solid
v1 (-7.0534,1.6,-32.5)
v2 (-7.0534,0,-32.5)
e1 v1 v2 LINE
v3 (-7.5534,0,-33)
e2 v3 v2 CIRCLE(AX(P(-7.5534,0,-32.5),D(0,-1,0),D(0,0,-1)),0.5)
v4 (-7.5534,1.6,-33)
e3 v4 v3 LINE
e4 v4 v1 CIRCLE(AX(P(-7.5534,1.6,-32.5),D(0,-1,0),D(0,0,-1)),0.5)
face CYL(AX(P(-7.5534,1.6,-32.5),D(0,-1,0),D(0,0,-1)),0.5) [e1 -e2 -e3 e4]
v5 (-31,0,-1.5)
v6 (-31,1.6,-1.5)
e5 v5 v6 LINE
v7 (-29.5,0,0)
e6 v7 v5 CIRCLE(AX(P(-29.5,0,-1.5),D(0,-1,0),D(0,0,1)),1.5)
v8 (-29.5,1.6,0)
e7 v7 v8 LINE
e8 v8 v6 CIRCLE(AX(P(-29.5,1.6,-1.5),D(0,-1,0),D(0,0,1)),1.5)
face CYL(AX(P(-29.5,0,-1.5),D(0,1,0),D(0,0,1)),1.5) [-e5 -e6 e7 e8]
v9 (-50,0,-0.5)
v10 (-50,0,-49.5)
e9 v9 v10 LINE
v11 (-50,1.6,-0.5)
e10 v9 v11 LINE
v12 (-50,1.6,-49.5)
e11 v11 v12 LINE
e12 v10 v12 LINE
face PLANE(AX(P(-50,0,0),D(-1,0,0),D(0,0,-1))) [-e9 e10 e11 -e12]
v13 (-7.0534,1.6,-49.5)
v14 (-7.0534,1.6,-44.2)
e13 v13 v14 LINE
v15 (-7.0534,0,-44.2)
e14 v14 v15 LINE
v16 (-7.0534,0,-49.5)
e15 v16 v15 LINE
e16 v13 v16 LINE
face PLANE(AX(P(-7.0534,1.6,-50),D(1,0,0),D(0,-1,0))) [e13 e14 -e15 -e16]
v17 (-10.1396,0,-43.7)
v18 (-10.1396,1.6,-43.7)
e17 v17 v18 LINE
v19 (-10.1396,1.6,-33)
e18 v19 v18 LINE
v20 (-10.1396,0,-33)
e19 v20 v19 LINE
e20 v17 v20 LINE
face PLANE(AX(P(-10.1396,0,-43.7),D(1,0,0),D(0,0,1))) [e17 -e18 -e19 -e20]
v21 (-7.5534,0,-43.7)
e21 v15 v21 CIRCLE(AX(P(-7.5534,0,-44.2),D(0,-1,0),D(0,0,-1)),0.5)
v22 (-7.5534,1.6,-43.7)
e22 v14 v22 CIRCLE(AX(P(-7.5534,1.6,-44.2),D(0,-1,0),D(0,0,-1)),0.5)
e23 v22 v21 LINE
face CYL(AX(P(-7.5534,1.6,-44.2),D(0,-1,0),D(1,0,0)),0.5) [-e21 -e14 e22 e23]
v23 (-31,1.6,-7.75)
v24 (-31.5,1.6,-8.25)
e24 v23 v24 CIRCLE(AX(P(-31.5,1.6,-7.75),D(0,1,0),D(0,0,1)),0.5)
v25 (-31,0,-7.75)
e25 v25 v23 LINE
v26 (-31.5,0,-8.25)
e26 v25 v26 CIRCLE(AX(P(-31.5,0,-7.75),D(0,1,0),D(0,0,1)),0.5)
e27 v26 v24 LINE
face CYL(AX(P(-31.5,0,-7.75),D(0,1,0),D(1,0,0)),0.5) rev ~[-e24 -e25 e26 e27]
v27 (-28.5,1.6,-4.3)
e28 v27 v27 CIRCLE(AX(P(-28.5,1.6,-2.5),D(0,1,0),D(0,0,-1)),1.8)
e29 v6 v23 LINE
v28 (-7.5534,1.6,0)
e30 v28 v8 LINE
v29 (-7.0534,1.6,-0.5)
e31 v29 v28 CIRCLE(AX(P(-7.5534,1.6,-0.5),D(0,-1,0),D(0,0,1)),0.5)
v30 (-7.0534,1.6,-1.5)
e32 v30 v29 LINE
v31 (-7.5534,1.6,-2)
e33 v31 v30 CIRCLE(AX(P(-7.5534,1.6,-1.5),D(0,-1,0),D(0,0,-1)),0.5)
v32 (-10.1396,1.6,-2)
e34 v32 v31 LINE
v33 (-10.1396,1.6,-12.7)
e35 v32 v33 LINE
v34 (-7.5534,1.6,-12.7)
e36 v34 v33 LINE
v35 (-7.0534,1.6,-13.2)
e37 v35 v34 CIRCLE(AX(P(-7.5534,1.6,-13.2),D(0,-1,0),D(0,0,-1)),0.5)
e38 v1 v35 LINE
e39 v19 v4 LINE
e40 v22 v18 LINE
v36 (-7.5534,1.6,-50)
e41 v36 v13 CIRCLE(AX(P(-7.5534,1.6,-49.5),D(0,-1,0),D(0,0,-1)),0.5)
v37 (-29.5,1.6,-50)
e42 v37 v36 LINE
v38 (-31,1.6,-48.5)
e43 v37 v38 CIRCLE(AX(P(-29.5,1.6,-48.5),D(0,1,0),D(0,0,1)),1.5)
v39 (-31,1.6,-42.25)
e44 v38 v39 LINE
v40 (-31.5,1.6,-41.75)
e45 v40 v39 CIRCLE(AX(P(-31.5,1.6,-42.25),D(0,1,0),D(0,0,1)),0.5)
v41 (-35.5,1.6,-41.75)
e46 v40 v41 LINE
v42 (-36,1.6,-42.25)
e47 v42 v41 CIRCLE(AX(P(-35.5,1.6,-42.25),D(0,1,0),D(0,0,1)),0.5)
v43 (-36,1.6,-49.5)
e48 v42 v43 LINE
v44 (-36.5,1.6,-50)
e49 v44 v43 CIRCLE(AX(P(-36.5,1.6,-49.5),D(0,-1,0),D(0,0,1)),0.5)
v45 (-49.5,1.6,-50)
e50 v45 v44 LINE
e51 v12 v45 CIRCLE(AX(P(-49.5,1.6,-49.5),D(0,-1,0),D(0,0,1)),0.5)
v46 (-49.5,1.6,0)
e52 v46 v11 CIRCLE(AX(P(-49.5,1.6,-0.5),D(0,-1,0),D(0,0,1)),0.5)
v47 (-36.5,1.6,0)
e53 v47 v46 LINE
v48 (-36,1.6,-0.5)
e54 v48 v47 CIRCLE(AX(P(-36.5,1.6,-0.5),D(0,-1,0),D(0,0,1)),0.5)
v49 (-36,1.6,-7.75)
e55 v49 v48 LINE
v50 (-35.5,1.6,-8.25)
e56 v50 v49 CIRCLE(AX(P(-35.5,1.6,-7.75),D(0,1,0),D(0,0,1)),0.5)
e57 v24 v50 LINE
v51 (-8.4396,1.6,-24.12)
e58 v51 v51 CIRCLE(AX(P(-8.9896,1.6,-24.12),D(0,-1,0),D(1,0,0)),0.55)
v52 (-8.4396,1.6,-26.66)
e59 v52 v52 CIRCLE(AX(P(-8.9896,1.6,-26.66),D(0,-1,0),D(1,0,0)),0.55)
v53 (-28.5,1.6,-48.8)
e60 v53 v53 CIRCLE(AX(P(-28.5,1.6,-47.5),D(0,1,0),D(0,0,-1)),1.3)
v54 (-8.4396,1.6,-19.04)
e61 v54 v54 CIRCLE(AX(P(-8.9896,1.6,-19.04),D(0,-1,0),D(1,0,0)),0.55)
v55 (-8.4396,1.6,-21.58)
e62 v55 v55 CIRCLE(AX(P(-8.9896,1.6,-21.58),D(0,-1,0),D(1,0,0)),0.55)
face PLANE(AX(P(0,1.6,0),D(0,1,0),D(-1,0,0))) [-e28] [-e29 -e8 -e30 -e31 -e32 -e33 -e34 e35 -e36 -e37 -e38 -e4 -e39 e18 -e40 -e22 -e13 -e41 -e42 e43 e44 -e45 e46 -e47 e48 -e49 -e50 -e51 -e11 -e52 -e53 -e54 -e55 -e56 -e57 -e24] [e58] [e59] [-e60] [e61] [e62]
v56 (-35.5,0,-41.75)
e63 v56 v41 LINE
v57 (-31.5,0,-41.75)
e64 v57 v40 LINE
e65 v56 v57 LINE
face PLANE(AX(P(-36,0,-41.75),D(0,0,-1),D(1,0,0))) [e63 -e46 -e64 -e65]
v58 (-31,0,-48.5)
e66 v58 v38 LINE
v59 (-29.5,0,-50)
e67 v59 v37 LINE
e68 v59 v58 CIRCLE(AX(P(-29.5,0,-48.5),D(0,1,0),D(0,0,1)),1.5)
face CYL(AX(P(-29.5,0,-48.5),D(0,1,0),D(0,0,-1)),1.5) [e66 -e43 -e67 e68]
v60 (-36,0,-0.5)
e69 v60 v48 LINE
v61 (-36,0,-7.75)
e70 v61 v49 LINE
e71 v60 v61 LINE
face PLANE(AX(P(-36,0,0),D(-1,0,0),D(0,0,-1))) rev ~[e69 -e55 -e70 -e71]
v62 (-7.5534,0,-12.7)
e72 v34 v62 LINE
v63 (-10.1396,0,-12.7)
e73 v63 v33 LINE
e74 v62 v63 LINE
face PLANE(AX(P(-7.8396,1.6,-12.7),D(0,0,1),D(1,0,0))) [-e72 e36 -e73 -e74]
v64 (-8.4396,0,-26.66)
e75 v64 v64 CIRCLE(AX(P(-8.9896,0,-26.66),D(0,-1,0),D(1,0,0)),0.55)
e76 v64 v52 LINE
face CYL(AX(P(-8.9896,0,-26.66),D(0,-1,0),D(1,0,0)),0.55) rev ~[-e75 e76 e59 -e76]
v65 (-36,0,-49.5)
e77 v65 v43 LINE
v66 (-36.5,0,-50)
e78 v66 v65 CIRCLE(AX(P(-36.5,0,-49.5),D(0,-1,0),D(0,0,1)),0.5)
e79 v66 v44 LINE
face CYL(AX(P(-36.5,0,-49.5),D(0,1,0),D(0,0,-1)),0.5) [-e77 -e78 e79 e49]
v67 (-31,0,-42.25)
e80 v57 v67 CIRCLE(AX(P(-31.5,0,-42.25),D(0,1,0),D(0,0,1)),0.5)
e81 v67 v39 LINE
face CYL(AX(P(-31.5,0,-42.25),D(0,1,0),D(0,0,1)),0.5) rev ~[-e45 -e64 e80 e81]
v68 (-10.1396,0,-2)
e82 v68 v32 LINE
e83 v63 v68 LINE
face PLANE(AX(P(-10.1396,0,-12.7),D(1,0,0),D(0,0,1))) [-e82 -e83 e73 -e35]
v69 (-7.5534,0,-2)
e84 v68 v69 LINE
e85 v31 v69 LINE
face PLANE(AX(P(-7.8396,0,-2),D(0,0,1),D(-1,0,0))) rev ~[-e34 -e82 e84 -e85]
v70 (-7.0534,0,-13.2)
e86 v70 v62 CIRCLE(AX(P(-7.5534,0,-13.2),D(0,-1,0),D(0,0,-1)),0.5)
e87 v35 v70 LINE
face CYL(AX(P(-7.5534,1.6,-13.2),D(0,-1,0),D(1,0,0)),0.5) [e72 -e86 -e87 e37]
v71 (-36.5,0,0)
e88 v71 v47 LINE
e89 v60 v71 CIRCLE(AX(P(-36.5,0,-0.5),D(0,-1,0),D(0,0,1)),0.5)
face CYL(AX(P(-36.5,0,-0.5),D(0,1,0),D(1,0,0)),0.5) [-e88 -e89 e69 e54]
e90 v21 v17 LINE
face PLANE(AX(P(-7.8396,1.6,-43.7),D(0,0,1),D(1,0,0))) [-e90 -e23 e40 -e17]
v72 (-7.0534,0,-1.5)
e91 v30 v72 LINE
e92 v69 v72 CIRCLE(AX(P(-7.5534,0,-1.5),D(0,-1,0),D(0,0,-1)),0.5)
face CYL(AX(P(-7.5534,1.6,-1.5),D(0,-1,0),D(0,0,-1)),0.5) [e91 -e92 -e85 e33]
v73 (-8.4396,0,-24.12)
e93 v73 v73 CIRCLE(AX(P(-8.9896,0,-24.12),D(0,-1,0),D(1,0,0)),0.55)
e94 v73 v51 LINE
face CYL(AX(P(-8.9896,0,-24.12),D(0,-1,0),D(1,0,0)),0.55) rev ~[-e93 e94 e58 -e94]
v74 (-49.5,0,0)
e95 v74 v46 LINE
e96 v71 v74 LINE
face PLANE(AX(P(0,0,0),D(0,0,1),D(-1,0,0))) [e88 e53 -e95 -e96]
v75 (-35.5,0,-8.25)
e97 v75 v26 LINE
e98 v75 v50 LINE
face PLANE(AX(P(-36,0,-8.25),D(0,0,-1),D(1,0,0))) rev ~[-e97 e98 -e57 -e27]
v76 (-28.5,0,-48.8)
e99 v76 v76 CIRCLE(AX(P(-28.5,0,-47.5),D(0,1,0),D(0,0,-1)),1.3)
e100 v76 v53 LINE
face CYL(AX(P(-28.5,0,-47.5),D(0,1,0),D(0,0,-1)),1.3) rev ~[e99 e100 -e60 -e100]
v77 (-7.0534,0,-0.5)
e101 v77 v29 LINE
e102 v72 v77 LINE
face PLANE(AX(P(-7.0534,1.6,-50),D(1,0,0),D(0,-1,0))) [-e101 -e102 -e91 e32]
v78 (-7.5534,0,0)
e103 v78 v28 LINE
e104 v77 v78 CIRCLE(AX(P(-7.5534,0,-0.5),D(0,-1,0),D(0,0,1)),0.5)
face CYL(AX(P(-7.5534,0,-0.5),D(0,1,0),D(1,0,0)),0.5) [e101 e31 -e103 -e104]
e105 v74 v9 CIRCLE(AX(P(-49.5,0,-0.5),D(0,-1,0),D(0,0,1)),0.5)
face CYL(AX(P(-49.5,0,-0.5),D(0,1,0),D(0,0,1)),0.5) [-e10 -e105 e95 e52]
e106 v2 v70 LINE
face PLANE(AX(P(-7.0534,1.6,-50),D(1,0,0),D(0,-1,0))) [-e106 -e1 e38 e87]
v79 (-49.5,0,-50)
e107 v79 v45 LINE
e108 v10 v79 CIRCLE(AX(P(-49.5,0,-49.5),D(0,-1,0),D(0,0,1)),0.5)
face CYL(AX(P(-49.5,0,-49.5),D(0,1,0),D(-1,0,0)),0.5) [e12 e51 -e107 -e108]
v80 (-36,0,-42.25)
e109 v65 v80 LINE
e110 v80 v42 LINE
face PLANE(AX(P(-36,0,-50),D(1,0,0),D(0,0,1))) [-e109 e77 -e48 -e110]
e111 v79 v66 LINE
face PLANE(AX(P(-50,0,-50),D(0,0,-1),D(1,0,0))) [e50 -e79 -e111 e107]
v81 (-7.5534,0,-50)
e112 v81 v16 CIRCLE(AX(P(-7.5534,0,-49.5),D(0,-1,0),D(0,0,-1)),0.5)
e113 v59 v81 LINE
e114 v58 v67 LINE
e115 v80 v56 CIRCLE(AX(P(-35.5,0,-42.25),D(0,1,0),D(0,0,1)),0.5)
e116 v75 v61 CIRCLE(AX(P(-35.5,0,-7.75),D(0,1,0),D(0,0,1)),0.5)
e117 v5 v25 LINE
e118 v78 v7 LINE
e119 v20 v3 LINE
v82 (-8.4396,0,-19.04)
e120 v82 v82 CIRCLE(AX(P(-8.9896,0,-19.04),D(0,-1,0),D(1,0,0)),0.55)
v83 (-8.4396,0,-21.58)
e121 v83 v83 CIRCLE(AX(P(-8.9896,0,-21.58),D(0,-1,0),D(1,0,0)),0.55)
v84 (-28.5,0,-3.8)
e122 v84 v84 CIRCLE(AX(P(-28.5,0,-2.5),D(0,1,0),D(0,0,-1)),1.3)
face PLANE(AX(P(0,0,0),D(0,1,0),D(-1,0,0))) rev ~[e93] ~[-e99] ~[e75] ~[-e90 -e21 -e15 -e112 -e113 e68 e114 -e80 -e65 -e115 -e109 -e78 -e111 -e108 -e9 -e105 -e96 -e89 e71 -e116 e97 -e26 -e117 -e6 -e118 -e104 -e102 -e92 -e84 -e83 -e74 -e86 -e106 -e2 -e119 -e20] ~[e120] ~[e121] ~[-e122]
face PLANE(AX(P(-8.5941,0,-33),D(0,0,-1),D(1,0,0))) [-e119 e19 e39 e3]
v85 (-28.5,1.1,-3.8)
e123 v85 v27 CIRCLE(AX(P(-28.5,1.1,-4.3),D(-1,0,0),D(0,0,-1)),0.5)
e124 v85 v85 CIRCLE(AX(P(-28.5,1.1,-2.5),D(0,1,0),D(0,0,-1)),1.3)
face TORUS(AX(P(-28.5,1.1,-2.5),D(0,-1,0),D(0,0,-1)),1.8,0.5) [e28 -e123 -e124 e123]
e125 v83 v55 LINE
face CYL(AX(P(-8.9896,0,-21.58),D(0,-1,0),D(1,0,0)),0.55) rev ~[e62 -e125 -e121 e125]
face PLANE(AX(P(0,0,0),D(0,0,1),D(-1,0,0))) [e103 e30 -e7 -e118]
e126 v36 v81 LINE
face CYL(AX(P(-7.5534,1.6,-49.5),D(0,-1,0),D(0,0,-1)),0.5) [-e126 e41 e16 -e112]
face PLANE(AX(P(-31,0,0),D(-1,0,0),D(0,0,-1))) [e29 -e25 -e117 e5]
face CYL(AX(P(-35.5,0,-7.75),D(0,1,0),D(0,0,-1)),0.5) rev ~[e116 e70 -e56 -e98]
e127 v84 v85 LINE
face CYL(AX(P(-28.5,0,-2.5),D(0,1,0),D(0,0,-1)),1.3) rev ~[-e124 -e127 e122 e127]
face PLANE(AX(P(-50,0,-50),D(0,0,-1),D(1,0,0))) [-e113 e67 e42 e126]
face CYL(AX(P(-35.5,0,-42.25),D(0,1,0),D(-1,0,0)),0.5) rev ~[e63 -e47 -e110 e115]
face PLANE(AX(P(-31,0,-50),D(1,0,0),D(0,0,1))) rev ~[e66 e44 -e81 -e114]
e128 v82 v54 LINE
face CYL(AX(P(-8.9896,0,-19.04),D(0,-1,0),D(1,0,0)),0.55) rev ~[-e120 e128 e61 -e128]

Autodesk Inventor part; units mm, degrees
ref_plane "YZ Plane" through (0, 0, 0) normal (1, 0, 0) x (0, 1, 0)
ref_plane "XZ Plane" through (0, 0, 0) normal (0, 1, 0) x (-1, 0, 0)
ref_plane "XY Plane" through (0, 0, 0) normal (0, 0, 1) x (1, 0, 0)
sketch "Szkic1" plane through (0, 0, 0) normal (0, 1, 0) x (-1, 0, 0)
  line L0 (0, 0) -> (50, 0)
  line L1 (50, 0) -> (50, -50)
  line L2 (50, -50) -> (0, -50)
  line L3 (0, -50) -> (0, 0)
  dimension "d0" = 50
  dimension "d1" = 50
extrude "Wyciągnięcie proste1" add sketch "Szkic1" along normal blind 1.6
sketch "Szkic2" plane through (-50, 0, 0) normal (0, 0, 1) x (1, 0, 0)
  line L0 (0, 0) -> (50, 0) projected
  line L1 (50, 0) -> (50, 1.6) projected
  line L2 (0, 1.6) -> (50, 1.6) projected
  line L3 (0, 0) -> (0, 1.6) projected
  line L4 (47.9294, 17.85) -> (42.5705, -2.15) projected
  line L5 (42.5705, -2.15) -> (44.641, -2.15) projected
  line L6 (44.641, -2.15) -> (50, 17.85) projected
  line L7 (50, 17.85) -> (47.9294, 17.85) projected
  point P0 (43.5753, 1.6)
  point P1 (43.1466, 0)
extrude "Wyciągnięcie proste2" cut sketch "Szkic2" against normal through all contours L4 L2 L6 L0 | L6 L2 L1 L0
sketch "Szkic3" plane through (0, 0, 0) normal (0, -1, 0) x (1, 0, 0)
  line L0 (-8.5941, -2) -> (-8.5941, -12.7) projected
  line L1 (-8.5941, -2) -> (-10.1396, -2) projected
  line L2 (-10.1396, -12.7) -> (-10.1396, -2) projected
  line L3 (-8.5941, -12.7) -> (-10.1396, -12.7) projected
  line L4 (-10.1396, -12.7) -> (-7.8396, -12.7)
  line L5 (-7.8396, -12.7) -> (-7.8396, -2)
  line L6 (-7.8396, -2) -> (-10.1396, -2)
  line L7 (-10.1396, -2) -> (-10.1396, -12.7)
  line L8 (-8.5941, -33) -> (-8.5941, -43.7) projected
  line L9 (-8.5941, -33) -> (-10.1396, -33) projected
  line L10 (-10.1396, -43.7) -> (-10.1396, -33) projected
  line L11 (-8.5941, -43.7) -> (-10.1396, -43.7) projected
  line L12 (-10.1396, -33) -> (-7.8396, -33)
  line L13 (-7.8396, -33) -> (-7.8396, -43.7)
  line L14 (-7.8396, -43.7) -> (-10.1396, -43.7)
  line L15 (-10.1396, -43.7) -> (-10.1396, -33)
  point P0 (0, 0)
  dimension "d6" = 2.3
  dimension "d7" = 2.3
extrude "Wyciągnięcie proste3" cut sketch "Szkic3" against normal through all
sketch "Szkic4" plane through (0, 0, 0) normal (0, -1, 0) x (1, 0, 0)
  line L0 (-10.1396, -33) -> (-7.8396, -33) projected
  line L1 (-7.8396, -12.7) -> (-10.1396, -12.7) projected
  line L2 (-8.9896, -12.7) -> (-8.9896, -33) construction
  circle A0 centre (-8.9896, -26.66) radius 0.55
  circle A1 centre (-8.9896, -24.12) radius 0.55
  circle A2 centre (-8.9896, -21.58) radius 0.55
  circle A3 centre (-8.9896, -19.04) radius 0.55
  point P0 (0, 0)
  dimension "d10" = 1.1
  dimension "d14" = 2.54
  dimension "d19" = 6.34
extrude "Wyciągnięcie proste4" cut sketch "Szkic4" against normal through all
sketch "Szkic5" plane through (0, 0, 0) normal (0, -1, 0) x (1, 0, 0)
  line L0 (-50, -50) -> (-50, 0) projected
  circle A0 centre (-8.9896, -21.58) radius 0.55 projected
  circle A1 centre (-8.9896, -24.12) radius 0.55 projected
  circle A2 centre (-8.9896, -19.04) radius 0.55 projected
  circle A3 centre (-8.9896, -26.66) radius 0.55 projected
  line L1 (-10.1396, -12.7) -> (-10.1396, -2) projected
  line L2 (-10.1396, -2) -> (-7.8396, -2) projected
  line L3 (-7.8396, -2) -> (-7.8396, -12.7) projected
  line L4 (-7.8396, -12.7) -> (-10.1396, -12.7) projected
  line L5 (-10.1396, -43.7) -> (-10.1396, -33) projected
  line L6 (-10.1396, -33) -> (-7.8396, -33) projected
  line L7 (-7.8396, -33) -> (-7.8396, -43.7) projected
  line L8 (-7.8396, -43.7) -> (-10.1396, -43.7) projected
  line L9 (-6.8534, -50) -> (-6.8534, 0) projected
  line L10 (-50, 0) -> (-6.8534, 0) projected
  line L11 (-50, -50) -> (-50, 0) projected
  line L12 (-6.8534, -50) -> (-50, -50) projected
  line L13 (-50, -50) -> (-50, 0) projected
  line L14 (-50, -25) -> (-6.8534, -25)
  line L15 (-34, -48.25) -> (-34, -43.25) projected
  line L16 (-32, -48.25) -> (-34, -48.25) projected
  line L17 (-32, -43.25) -> (-32, -48.25) projected
  line L18 (-34, -43.25) -> (-32, -43.25) projected
  line L19 (-30.5, -46.7732) -> (-30.5, -50) projected
  line L20 (-36, -50) -> (-50, -50) projected
  line L21 (-28, -36) -> (-45.016, -36) projected
  line L22 (-30.5, -50) -> (-36, -50)
  line L23 (-36, -50) -> (-36, -41.75)
  line L24 (-36, -41.75) -> (-30.5, -41.75)
  line L25 (-30.5, -41.75) -> (-30.5, -50)
  line L26 (-36, 0) -> (-36, -8.25)
  line L27 (-36, -8.25) -> (-30.5, -8.25)
  line L28 (-30.5, -8.25) -> (-30.5, 0)
  point P0 (0, 0)
  dimension "d22" = 2
  dimension "d23" = 1.5
extrude "Wyciągnięcie proste5" cut sketch "Szkic5" against normal through all contours L23 L24 L25 L19 L12 | L10 L28 L27 L26 | L15 L18 L17 L16
fillet "Zaokrąglenie2" radius 0.5 2 edges at (-50, 0.8, 0) (-50, 0.8, -50)
sketch "Szkic7" plane through (-6.8534, 0, -50) normal (0, 0, -1) x (-1, 0, 0)
  line L0 (-0.4287, 1.6) -> (23.6466, 1.6) projected
  line L1 (-0.4287, 1.6) -> (0, 0) projected
  line L2 (0, 0) -> (23.6466, 0) projected
  line L3 (0, 0) -> (0, 1.6)
  line L4 (0.2, 1.6) -> (0.2, 0)
  line L5 (23.6466, 0) -> (23.6466, 1.6) projected
  line L6 (42.6466, 1.6) -> (42.6466, 0) projected
  line L7 (29.1466, 1.6) -> (42.6466, 1.6) projected
  line L8 (29.1466, 1.6) -> (29.1466, 0) projected
  line L9 (29.1466, 0) -> (42.6466, 0) projected
  point P0 (-6.8534, 0)
  dimension "d30" = 0.2
extrude "Wyciągnięcie proste7" cut sketch "Szkic7" against normal through all contours L0 L3 L1 | L0 L4 L2 L3
sketch "Szkic9" plane through (0, 1.6, 0) normal (0, 1, 0) x (1, 0, 0)
  circle A0 centre (-8.9896, 21.58) radius 0.55 projected
  circle A1 centre (-8.9896, 24.12) radius 0.55 projected
  circle A2 centre (-8.9896, 19.04) radius 0.55 projected
  circle A3 centre (-8.9896, 26.66) radius 0.55 projected
  line L0 (-10.1396, 2) -> (-10.1396, 12.7) projected
  line L1 (-10.1396, 12.7) -> (-7.8396, 12.7) projected
  line L2 (-7.8396, 12.7) -> (-7.8396, 2) projected
  line L3 (-7.8396, 2) -> (-10.1396, 2) projected
  line L4 (-10.1396, 33) -> (-10.1396, 43.7) projected
  line L5 (-10.1396, 43.7) -> (-7.8396, 43.7) projected
  line L6 (-7.8396, 43.7) -> (-7.8396, 33) projected
  line L7 (-7.8396, 33) -> (-10.1396, 33) projected
  line L8 (-7.0534, 0) -> (-7.0534, 50) projected
  line L9 (-7.0534, 50) -> (-30.5, 50) projected
  line L10 (-30.5, 50) -> (-30.5, 41.75) projected
  line L11 (-30.5, 41.75) -> (-36, 41.75) projected
  line L12 (-36, 41.75) -> (-36, 50) projected
  line L13 (-36, 50) -> (-49.5, 50) projected
  arc A4 (-49.5, 50) -> (-50, 49.5) centre (-49.5, 49.5) ccw projected
  line L14 (-50, 49.5) -> (-50, 0.5) projected
  arc A5 (-50, 0.5) -> (-49.5, 0) centre (-49.5, 0.5) ccw projected
  line L15 (-49.5, 0) -> (-36, 0) projected
  line L16 (-36, 0) -> (-36, 8.25) projected
  line L17 (-36, 8.25) -> (-30.5, 8.25) projected
  line L18 (-30.5, 8.25) -> (-30.5, 0) projected
  line L19 (-30.5, 0) -> (-7.0534, 0) projected
  line L20 (-10.1396, 12.7) -> (-7.0534, 12.7)
  line L21 (-7.0534, 12.7) -> (-7.0534, 2)
  line L22 (-7.0534, 2) -> (-10.1396, 2)
  line L23 (-10.1396, 2) -> (-10.1396, 12.7)
  line L24 (-10.1396, 43.7) -> (-7.0534, 43.7)
  line L25 (-7.0534, 43.7) -> (-7.0534, 33)
  line L26 (-7.0534, 33) -> (-10.1396, 33)
  line L27 (-10.1396, 33) -> (-10.1396, 43.7)
  point P0 (0, 0)
  point P1 (-7.8396, 2)
extrude "Wyciągnięcie proste8" cut sketch "Szkic9" against normal through all contours L2 L20 L8 L22 | L26 L6 L24 L8
fillet "Zaokrąglenie3" radius 0.5 6 edges at (-7.0534, 0.8, -12.7) (-7.0534, 0.8, -33) (-7.0534, 0.8, -43.7) (-7.0534, 0.8, -50) (-7.0534, 0.8, -2) (-7.0534, 0.8, 0)
sketch "Szkic11" plane through (0, 0, 0) normal (0, -1, 0) x (1, 0, 0)
  arc A0 (-7.0534, -0.5) -> (-7.5534, 0) centre (-7.5534, -0.5) ccw projected
  line L0 (-30.5, 0) -> (-7.5534, 0) projected
  line L1 (-30.5, 0) -> (-30.5, -8.25) projected
  line L2 (-30.5, -8.25) -> (-36, -8.25) projected
  line L3 (-36, -8.25) -> (-36, 0) projected
  line L4 (-49.5, 0) -> (-36, 0) projected
  arc A1 (-49.5, 0) -> (-50, -0.5) centre (-49.5, -0.5) ccw projected
  line L5 (-50, -49.5) -> (-50, -0.5) projected
  arc A2 (-50, -49.5) -> (-49.5, -50) centre (-49.5, -49.5) ccw projected
  line L6 (-36, -50) -> (-49.5, -50) projected
  line L7 (-36, -50) -> (-36, -41.75) projected
  line L8 (-36, -41.75) -> (-30.5, -41.75) projected
  line L9 (-30.5, -41.75) -> (-30.5, -50) projected
  line L10 (-7.5534, -50) -> (-30.5, -50) projected
  arc A3 (-7.5534, -50) -> (-7.0534, -49.5) centre (-7.5534, -49.5) ccw projected
  line L11 (-7.0534, -49.5) -> (-7.0534, -44.2) projected
  arc A4 (-7.0534, -44.2) -> (-7.5534, -43.7) centre (-7.5534, -44.2) ccw projected
  line L12 (-7.5534, -43.7) -> (-10.1396, -43.7) projected
  line L13 (-10.1396, -43.7) -> (-10.1396, -33) projected
  line L14 (-10.1396, -33) -> (-7.5534, -33) projected
  arc A5 (-7.5534, -33) -> (-7.0534, -32.5) centre (-7.5534, -32.5) ccw projected
  line L15 (-7.0534, -32.5) -> (-7.0534, -13.2) projected
  arc A6 (-7.0534, -13.2) -> (-7.5534, -12.7) centre (-7.5534, -13.2) ccw projected
  line L16 (-7.5534, -12.7) -> (-10.1396, -12.7) projected
  line L17 (-10.1396, -12.7) -> (-10.1396, -2) projected
  line L18 (-10.1396, -2) -> (-7.5534, -2) projected
  arc A7 (-7.5534, -2) -> (-7.0534, -1.5) centre (-7.5534, -1.5) ccw projected
  line L19 (-7.0534, -1.5) -> (-7.0534, -0.5) projected
  circle A8 centre (-8.9896, -26.66) radius 0.55 projected
  circle A9 centre (-8.9896, -19.04) radius 0.55 projected
  circle A10 centre (-8.9896, -24.12) radius 0.55 projected
  circle A11 centre (-8.9896, -21.58) radius 0.55 projected
  line L20 (-30.5, 0) -> (-31, 0)
  line L21 (-31, 0) -> (-31, -8.25)
  line L22 (-31, -8.25) -> (-30.5, -8.25)
  line L23 (-30.5, -8.25) -> (-30.5, 0)
  line L24 (-30.5, -50) -> (-31, -50)
  line L25 (-31, -50) -> (-31, -41.75)
  line L26 (-31, -41.75) -> (-30.5, -41.75)
  line L27 (-30.5, -41.75) -> (-30.5, -50)
  point P0 (0, 0)
  dimension "d40" = 0.5
  dimension "d41" = 0.5
extrude "Wyciągnięcie proste10" add sketch "Szkic11" against normal up to surface (1.6 mm away) contours L1 L2 L21 L20 | L8 L9 L24 L25
fillet "Zaokrąglenie4" radius 1.5 2 edges at (-31, 0.8, -50) (-31, 0.8, 0)
fillet "Zaokrąglenie5" radius 0.5 6 edges at (-31, 0.8, -8.25) (-36, 0.8, -8.25) (-36, 0.8, 0) (-36, 0.8, -50) (-36, 0.8, -41.75) (-31, 0.8, -41.75)
sketch "Szkic13" plane through (0, 0, 0) normal (0, -1, 0) x (1, 0, 0)
  circle A0 centre (-28.5, -2.5) radius 1 projected
  circle A1 centre (-28.5, -47.5) radius 1 projected
  point P0 (0, 0)
hole "Otwór2" at (-28.5, 0, -2.5) at (-28.5, 0, -47.5) direction (0, 1, 0) diameter 2.6 end through all
fillet "Zaokrąglenie6" radius 0.5 1 edges at (-28.5, 1.6, -1.2)
sketch "Szkic14" plane through (0, 0, 0) normal (0, -1, 0) x (1, 0, 0)
  circle A0 centre (-28.5, -2.5) radius 1.3 projected
  circle A1 centre (-28.5, -47.5) radius 1.3 projected
  arc A2 (-36.5, -50) -> (-36, -49.5) centre (-36.5, -49.5) ccw projected
  line L0 (-36, -49.5) -> (-36, -42.25) projected
  arc A3 (-35.5, -41.75) -> (-36, -42.25) centre (-35.5, -42.25) ccw projected
  line L1 (-35.5, -41.75) -> (-31.5, -41.75) projected
  arc A4 (-31, -42.25) -> (-31.5, -41.75) centre (-31.5, -42.25) ccw projected
  line L2 (-31, -42.25) -> (-31, -48.5) projected
  arc A5 (-31, -48.5) -> (-29.5, -50) centre (-29.5, -48.5) ccw projected
  line L3 (-29.5, -50) -> (-7.5534, -50) projected
  arc A6 (-7.5534, -50) -> (-7.0534, -49.5) centre (-7.5534, -49.5) ccw projected
  line L4 (-7.0534, -49.5) -> (-7.0534, -44.2) projected
  arc A7 (-7.0534, -44.2) -> (-7.5534, -43.7) centre (-7.5534, -44.2) ccw projected
  line L5 (-7.5534, -43.7) -> (-10.1396, -43.7) projected
  line L6 (-10.1396, -43.7) -> (-10.1396, -33) projected
  line L7 (-10.1396, -33) -> (-7.5534, -33) projected
  arc A8 (-7.5534, -33) -> (-7.0534, -32.5) centre (-7.5534, -32.5) ccw projected
  line L8 (-7.0534, -32.5) -> (-7.0534, -13.2) projected
  arc A9 (-7.0534, -13.2) -> (-7.5534, -12.7) centre (-7.5534, -13.2) ccw projected
  line L9 (-7.5534, -12.7) -> (-10.1396, -12.7) projected
  line L10 (-10.1396, -12.7) -> (-10.1396, -2) projected
  line L11 (-10.1396, -2) -> (-7.5534, -2) projected
  arc A10 (-7.5534, -2) -> (-7.0534, -1.5) centre (-7.5534, -1.5) ccw projected
  line L12 (-7.0534, -1.5) -> (-7.0534, -0.5) projected
  arc A11 (-7.0534, -0.5) -> (-7.5534, 0) centre (-7.5534, -0.5) ccw projected
  line L13 (-29.5, 0) -> (-7.5534, 0) projected
  arc A12 (-29.5, 0) -> (-31, -1.5) centre (-29.5, -1.5) ccw projected
  line L14 (-31, -1.5) -> (-31, -7.75) projected
  arc A13 (-31.5, -8.25) -> (-31, -7.75) centre (-31.5, -7.75) ccw projected
  line L15 (-31.5, -8.25) -> (-35.5, -8.25) projected
  arc A14 (-36, -7.75) -> (-35.5, -8.25) centre (-35.5, -7.75) ccw projected
  line L16 (-36, -7.75) -> (-36, -0.5) projected
  arc A15 (-36, -0.5) -> (-36.5, 0) centre (-36.5, -0.5) ccw projected
  line L17 (-49.5, 0) -> (-36.5, 0) projected
  arc A16 (-49.5, 0) -> (-50, -0.5) centre (-49.5, -0.5) ccw projected
  line L18 (-50, -49.5) -> (-50, -0.5) projected
  arc A17 (-50, -49.5) -> (-49.5, -50) centre (-49.5, -49.5) ccw projected
  line L19 (-36.5, -50) -> (-49.5, -50) projected
  circle A18 centre (-8.9896, -21.58) radius 0.55 projected
  circle A19 centre (-8.9896, -24.12) radius 0.55 projected
  circle A20 centre (-8.9896, -19.04) radius 0.55 projected
  circle A21 centre (-8.9896, -26.66) radius 0.55 projected
  point P0 (0, 0)
properties part number "PCB_GORNE"
